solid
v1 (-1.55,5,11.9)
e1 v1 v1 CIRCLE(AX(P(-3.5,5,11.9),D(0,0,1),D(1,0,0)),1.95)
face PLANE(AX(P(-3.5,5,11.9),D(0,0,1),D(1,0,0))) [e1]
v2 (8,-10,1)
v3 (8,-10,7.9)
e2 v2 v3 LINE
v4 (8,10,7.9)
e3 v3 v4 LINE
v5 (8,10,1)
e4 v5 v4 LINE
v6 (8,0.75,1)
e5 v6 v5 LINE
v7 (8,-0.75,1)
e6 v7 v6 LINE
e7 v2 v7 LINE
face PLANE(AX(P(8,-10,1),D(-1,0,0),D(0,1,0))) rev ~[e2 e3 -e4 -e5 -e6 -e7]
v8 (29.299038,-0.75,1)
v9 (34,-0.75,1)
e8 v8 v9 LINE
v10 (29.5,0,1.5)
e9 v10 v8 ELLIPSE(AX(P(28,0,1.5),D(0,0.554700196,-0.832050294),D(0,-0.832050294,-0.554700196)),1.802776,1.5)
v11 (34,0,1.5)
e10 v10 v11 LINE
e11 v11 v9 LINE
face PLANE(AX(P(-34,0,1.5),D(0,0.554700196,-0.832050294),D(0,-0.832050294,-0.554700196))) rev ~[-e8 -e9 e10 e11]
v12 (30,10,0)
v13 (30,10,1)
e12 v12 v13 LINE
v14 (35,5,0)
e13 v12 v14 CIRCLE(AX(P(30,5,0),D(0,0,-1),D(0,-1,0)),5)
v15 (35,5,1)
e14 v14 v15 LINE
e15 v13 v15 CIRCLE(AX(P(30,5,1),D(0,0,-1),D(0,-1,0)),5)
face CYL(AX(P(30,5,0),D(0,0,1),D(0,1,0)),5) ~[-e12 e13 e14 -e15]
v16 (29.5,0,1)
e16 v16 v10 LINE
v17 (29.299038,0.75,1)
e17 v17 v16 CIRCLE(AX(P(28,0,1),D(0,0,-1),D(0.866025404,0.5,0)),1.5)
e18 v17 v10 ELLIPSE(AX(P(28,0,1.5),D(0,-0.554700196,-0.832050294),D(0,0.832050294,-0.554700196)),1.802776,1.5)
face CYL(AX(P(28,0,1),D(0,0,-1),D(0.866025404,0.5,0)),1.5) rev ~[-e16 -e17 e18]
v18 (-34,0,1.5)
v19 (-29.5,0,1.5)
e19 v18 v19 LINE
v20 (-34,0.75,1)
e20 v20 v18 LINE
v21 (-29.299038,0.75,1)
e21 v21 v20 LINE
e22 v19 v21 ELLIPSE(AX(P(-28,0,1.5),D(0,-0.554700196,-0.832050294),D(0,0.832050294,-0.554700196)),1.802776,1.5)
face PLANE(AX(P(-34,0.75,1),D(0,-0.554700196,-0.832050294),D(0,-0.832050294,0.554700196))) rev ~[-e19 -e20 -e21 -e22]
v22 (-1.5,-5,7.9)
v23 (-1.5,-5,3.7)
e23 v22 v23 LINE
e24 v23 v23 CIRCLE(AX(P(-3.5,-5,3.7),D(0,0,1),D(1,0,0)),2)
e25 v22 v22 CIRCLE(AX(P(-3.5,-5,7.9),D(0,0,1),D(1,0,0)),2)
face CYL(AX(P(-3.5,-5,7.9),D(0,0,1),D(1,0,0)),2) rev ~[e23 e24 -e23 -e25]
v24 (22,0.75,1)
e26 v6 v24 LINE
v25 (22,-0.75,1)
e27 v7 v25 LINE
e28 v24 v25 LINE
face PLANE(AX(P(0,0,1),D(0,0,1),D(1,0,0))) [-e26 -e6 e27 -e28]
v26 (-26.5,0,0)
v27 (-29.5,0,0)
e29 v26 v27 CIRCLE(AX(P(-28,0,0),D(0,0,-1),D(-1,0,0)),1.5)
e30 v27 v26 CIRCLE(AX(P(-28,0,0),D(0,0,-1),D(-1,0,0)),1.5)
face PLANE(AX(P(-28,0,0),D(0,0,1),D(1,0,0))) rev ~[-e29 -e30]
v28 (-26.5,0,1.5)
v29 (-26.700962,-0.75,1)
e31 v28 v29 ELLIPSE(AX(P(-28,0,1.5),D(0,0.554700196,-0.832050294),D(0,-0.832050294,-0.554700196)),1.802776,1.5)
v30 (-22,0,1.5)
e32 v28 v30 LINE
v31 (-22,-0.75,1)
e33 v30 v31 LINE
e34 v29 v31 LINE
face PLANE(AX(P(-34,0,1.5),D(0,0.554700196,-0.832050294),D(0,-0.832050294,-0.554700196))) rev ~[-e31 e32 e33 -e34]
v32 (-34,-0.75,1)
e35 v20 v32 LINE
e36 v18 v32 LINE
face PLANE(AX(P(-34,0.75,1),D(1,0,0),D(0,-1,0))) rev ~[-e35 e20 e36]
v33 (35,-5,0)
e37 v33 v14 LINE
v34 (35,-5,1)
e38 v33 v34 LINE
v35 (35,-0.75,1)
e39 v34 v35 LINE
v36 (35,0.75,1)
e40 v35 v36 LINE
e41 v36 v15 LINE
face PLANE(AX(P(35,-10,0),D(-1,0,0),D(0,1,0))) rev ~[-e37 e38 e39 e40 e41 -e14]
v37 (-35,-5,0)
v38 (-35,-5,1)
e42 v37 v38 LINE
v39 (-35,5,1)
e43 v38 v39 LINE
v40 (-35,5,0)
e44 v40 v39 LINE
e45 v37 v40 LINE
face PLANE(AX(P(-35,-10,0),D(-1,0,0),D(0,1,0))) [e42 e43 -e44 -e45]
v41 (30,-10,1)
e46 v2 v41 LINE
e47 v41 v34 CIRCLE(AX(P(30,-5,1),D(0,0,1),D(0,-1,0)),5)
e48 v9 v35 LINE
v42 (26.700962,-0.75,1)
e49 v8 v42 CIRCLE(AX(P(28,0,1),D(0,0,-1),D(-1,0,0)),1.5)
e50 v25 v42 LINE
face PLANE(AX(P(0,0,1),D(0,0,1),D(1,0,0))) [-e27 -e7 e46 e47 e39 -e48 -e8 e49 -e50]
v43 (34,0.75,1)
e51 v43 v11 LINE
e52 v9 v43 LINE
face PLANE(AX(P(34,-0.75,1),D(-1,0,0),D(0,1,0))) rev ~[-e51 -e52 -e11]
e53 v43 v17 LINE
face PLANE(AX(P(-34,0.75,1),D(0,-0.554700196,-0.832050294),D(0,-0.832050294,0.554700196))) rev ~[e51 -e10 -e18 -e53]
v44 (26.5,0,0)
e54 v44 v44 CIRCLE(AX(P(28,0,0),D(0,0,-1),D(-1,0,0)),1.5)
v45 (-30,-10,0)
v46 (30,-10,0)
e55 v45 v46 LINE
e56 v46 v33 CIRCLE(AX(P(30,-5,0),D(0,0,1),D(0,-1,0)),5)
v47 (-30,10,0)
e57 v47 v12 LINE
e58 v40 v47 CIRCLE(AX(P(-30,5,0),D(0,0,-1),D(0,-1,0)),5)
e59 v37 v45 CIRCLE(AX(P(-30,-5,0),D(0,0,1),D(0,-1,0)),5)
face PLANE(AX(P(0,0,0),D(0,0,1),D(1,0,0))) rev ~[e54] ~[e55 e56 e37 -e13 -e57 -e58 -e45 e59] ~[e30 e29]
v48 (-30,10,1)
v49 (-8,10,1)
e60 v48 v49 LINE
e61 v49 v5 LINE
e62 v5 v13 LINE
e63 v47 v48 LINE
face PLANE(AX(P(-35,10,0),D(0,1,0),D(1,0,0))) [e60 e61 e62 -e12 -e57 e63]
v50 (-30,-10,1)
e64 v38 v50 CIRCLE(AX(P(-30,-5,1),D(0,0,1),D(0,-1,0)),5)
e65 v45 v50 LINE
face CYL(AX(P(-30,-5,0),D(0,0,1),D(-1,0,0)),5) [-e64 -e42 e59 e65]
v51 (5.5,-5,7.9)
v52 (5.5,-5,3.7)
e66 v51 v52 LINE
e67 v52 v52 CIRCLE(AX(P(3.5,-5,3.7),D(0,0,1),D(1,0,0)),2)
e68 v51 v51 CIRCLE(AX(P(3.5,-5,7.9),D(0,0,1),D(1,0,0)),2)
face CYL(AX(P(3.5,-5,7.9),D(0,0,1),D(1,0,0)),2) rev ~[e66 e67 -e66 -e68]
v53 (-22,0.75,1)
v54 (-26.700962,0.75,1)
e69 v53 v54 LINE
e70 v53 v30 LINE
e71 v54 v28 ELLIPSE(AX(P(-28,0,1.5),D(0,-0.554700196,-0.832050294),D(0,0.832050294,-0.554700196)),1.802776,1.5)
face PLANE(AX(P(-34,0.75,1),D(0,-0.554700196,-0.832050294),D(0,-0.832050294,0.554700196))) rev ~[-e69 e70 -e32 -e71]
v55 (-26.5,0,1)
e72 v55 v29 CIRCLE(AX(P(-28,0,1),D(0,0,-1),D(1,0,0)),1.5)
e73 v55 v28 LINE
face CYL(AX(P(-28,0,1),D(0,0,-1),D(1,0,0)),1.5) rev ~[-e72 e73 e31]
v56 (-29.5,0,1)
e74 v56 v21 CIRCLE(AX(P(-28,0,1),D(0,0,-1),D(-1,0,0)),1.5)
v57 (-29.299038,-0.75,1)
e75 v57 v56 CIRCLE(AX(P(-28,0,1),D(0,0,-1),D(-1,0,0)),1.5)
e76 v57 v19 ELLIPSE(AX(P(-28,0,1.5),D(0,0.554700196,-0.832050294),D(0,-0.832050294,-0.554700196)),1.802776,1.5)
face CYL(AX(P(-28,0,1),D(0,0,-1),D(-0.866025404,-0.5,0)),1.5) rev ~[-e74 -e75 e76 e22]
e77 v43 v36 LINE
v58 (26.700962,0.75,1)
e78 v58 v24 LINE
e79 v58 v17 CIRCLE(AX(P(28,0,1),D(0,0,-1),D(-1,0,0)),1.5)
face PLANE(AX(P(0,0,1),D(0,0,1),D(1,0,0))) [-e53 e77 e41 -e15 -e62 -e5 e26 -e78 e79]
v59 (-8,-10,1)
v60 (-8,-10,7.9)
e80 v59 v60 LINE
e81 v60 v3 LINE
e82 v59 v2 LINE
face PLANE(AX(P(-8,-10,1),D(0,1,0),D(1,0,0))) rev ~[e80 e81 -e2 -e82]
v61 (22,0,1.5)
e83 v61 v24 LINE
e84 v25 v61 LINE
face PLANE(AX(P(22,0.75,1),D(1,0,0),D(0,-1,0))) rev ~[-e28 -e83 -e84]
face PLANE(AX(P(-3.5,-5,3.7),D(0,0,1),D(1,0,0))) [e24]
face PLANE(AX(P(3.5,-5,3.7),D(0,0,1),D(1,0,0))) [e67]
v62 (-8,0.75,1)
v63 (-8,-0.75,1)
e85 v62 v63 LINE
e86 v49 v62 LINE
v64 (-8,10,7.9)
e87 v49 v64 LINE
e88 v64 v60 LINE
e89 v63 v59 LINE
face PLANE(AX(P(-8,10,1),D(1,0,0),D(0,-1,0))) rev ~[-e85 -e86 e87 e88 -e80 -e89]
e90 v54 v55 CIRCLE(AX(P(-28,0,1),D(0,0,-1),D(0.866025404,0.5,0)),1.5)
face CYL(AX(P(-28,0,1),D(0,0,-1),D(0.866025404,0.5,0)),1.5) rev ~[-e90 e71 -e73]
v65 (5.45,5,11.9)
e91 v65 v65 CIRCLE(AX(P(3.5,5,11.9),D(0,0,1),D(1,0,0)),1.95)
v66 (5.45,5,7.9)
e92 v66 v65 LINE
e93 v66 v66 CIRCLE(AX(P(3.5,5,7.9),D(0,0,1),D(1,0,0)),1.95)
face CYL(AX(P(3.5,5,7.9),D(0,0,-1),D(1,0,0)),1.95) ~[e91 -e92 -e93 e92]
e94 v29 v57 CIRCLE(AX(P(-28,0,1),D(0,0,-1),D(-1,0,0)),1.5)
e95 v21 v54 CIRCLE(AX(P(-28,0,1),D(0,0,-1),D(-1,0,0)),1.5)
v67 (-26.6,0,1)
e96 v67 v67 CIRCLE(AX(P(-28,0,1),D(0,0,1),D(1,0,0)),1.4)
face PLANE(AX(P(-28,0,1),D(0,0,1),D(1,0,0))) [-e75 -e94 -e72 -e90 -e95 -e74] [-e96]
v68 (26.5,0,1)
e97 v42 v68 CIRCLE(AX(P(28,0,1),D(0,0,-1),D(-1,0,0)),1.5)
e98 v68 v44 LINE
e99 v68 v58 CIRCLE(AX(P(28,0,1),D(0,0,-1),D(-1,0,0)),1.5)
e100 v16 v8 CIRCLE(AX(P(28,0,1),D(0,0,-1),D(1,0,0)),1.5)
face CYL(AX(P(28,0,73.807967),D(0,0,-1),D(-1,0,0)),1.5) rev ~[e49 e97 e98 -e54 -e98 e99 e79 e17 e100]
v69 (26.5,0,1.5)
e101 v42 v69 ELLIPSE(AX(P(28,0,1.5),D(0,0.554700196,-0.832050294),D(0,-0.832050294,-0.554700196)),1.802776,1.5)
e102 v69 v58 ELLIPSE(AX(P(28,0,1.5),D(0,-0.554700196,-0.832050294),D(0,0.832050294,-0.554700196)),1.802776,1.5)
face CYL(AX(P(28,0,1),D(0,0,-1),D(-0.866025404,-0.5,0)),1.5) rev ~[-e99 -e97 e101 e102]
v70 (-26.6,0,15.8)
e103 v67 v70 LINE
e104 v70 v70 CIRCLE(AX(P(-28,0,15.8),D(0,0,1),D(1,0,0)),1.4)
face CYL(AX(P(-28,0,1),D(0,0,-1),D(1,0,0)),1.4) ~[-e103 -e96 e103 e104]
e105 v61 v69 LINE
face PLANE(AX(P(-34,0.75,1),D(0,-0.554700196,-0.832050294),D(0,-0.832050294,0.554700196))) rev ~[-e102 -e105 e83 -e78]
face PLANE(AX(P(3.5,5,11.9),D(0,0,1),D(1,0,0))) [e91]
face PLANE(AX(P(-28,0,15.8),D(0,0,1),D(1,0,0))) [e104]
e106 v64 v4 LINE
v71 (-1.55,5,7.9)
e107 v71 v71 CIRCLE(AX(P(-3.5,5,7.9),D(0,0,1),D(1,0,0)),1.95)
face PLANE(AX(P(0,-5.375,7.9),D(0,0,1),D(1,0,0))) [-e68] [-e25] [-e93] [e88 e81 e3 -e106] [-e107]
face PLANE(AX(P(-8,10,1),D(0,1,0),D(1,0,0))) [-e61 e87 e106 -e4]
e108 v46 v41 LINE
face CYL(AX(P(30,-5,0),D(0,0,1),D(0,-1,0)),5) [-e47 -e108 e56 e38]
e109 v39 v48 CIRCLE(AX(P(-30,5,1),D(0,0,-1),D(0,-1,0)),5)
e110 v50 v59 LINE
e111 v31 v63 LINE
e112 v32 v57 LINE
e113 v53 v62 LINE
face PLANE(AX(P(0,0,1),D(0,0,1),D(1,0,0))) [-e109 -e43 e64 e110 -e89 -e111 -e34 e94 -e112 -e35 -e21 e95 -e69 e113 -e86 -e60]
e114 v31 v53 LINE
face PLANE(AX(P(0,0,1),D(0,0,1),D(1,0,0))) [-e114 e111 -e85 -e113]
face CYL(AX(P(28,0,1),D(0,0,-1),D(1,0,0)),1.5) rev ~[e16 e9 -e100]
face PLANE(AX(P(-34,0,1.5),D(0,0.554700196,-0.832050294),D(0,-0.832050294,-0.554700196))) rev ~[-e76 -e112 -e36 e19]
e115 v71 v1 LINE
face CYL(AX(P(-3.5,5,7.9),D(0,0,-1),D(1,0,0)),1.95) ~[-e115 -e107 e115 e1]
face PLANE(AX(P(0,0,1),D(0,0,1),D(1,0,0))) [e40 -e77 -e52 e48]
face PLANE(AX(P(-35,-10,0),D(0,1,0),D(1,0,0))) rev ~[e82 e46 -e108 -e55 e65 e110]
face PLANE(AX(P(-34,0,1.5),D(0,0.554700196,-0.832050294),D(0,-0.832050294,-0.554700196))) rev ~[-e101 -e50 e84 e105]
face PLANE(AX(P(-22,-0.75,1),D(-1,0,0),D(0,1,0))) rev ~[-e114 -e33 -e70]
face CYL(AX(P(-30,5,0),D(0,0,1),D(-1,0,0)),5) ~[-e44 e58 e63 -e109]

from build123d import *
from build123d import SkipClean  # not in build123d's __all__

# Parameters (mm, degrees)
F0_W      = 70
F0_H      = 20
F1_DEPTH  = 1
F3_D      = 3
F4_R      = 5
F7_DEPTH  = 0.5
F9_DEPTH  = 69.001
F10_W     = 16
F10_H     = 9.25
F10_H_2   = 1.5
F11_DEPTH = 6.9
F12_R     = 1.95
F13_DEPTH = 4
F14_R     = 2
F15_DEPTH = 4.2
F16_R     = 1.5
F17_DEPTH = 1
F18_R     = 1.4
F19_DEPTH = 14.8


with BuildPart() as f1:
    # F0 (on Top) → F1 (new body)
    with BuildSketch(Plane.XY):
        Rectangle(F0_W, F0_H)
    extrude(amount=F1_DEPTH)

    # F3 (through all)
    with Locations(Plane.XY.offset(1)):
        with Locations((-28, 0), (28, 0)):
            Hole(F3_D / 2)

    # F4
    f4_edges = [f1.edges().sort_by_distance(p)[0] for p in [
        (-35, 10, 0.5),
        (-35, -10, 0.5),
        (35, 10, 0.5),
        (35, -10, 0.5),
    ]]
    fillet(f4_edges, radius=F4_R)

    # F5 (on face) + F6 (on face) → F7 (join)
    with BuildSketch(Plane.XY.offset(1)):
        with BuildLine():
            Line((-29.2990381057, 0.75), (-34, 0.75))
            Line((-34, 0.75), (-34, -0.75))
            Line((-34, -0.75), (-29.2990381057, -0.75))
            ThreePointArc((-29.2990381057, -0.75), (-29.5, 0), (-29.2990381057, 0.75))
        make_face()
        with BuildLine():
            Line((-22, 0.75), (-26.7009618943, 0.75))
            ThreePointArc((-26.7009618943, 0.75), (-26.5511112606, 0.3882285677), (-26.5, 0))
            ThreePointArc((-26.5, 0), (-26.5511112606, -0.3882285677), (-26.7009618943, -0.75))
            Line((-26.7009618943, -0.75), (-22, -0.75))
            Line((-22, -0.75), (-22, 0.75))
        make_face()
    with BuildSketch(Plane.XY.offset(1)):
        with BuildLine():
            Line((26.7009618943, 0.75), (22, 0.75))
            Line((22, 0.75), (22, -0.75))
            Line((22, -0.75), (26.7009618943, -0.75))
            ThreePointArc((26.7009618943, -0.75), (26.5, 0), (26.7009618943, 0.75))
        make_face()
        with BuildLine():
            Line((34, 0.75), (29.2990381057, 0.75))
            ThreePointArc((29.2990381057, 0.75), (29.4488887394, 0.3882285677), (29.5, 0))
            ThreePointArc((29.5, 0), (29.4488887394, -0.3882285677), (29.2990381057, -0.75))
            Line((29.2990381057, -0.75), (34, -0.75))
            Line((34, -0.75), (34, 0.75))
        make_face()
    with SkipClean():  # cleaning this boolean's faces spoils the solid; the shape is the same uncleaned
        extrude(amount=F7_DEPTH)

    # F8 (on face) → F9 (cut, through all)
    with BuildSketch(Plane(origin=(-34, 0, 0), x_dir=(0, -1, 0), z_dir=(-1, 0, 0))):
        Polygon((-0.75, 1.5), (-0.75, 1), (0, 1.5), align=None)
        Polygon((0.75, 1.5), (0, 1.5), (0.75, 1), align=None)
    with SkipClean():  # cleaning this boolean's faces spoils the solid; the shape is the same uncleaned
        extrude(amount=-F9_DEPTH, mode=Mode.SUBTRACT)

    # F10 (on face) → F11 (join)
    with BuildSketch(Plane.XY.offset(1)):
        with Locations((0, -5.375)):
            Rectangle(F10_W, F10_H)
        Rectangle(F10_W, F10_H_2)
        with Locations((0, 5.375)):
            Rectangle(F10_W, F10_H)
    with SkipClean():  # cleaning this boolean's faces spoils the solid; the shape is the same uncleaned
        extrude(amount=F11_DEPTH)

    # F12 (on face) → F13 (join)
    with BuildSketch(Plane.XY.offset(7.9)):
        with Locations((-3.5, 5)):
            Circle(F12_R)
        with Locations((3.5, 5)):
            Circle(F12_R)
    with SkipClean():  # cleaning this boolean's faces spoils the solid; the shape is the same uncleaned
        extrude(amount=F13_DEPTH)

    # F14 (on face) → F15 (cut)
    with BuildSketch(Plane.XY.offset(7.9)):
        with Locations((-3.5, -5)):
            Circle(F14_R)
        with Locations((3.5, -5)):
            Circle(F14_R)
    with SkipClean():  # cleaning this boolean's faces spoils the solid; the shape is the same uncleaned
        extrude(amount=-F15_DEPTH, mode=Mode.SUBTRACT)

    # F16 (on face) → F17 (join)
    with BuildSketch(Plane.XY.offset(1)):
        with Locations((-28, 0)):
            Circle(F16_R)
    with SkipClean():  # cleaning this boolean's faces spoils the solid; the shape is the same uncleaned
        extrude(amount=-F17_DEPTH)

    # F18 (on face) → F19 (join)
    with BuildSketch(Plane.XY.offset(1)):
        with Locations((-28, 0)):
            Circle(F18_R)
    with SkipClean():  # cleaning this boolean's faces spoils the solid; the shape is the same uncleaned
        extrude(amount=F19_DEPTH)


solid = f1.part
